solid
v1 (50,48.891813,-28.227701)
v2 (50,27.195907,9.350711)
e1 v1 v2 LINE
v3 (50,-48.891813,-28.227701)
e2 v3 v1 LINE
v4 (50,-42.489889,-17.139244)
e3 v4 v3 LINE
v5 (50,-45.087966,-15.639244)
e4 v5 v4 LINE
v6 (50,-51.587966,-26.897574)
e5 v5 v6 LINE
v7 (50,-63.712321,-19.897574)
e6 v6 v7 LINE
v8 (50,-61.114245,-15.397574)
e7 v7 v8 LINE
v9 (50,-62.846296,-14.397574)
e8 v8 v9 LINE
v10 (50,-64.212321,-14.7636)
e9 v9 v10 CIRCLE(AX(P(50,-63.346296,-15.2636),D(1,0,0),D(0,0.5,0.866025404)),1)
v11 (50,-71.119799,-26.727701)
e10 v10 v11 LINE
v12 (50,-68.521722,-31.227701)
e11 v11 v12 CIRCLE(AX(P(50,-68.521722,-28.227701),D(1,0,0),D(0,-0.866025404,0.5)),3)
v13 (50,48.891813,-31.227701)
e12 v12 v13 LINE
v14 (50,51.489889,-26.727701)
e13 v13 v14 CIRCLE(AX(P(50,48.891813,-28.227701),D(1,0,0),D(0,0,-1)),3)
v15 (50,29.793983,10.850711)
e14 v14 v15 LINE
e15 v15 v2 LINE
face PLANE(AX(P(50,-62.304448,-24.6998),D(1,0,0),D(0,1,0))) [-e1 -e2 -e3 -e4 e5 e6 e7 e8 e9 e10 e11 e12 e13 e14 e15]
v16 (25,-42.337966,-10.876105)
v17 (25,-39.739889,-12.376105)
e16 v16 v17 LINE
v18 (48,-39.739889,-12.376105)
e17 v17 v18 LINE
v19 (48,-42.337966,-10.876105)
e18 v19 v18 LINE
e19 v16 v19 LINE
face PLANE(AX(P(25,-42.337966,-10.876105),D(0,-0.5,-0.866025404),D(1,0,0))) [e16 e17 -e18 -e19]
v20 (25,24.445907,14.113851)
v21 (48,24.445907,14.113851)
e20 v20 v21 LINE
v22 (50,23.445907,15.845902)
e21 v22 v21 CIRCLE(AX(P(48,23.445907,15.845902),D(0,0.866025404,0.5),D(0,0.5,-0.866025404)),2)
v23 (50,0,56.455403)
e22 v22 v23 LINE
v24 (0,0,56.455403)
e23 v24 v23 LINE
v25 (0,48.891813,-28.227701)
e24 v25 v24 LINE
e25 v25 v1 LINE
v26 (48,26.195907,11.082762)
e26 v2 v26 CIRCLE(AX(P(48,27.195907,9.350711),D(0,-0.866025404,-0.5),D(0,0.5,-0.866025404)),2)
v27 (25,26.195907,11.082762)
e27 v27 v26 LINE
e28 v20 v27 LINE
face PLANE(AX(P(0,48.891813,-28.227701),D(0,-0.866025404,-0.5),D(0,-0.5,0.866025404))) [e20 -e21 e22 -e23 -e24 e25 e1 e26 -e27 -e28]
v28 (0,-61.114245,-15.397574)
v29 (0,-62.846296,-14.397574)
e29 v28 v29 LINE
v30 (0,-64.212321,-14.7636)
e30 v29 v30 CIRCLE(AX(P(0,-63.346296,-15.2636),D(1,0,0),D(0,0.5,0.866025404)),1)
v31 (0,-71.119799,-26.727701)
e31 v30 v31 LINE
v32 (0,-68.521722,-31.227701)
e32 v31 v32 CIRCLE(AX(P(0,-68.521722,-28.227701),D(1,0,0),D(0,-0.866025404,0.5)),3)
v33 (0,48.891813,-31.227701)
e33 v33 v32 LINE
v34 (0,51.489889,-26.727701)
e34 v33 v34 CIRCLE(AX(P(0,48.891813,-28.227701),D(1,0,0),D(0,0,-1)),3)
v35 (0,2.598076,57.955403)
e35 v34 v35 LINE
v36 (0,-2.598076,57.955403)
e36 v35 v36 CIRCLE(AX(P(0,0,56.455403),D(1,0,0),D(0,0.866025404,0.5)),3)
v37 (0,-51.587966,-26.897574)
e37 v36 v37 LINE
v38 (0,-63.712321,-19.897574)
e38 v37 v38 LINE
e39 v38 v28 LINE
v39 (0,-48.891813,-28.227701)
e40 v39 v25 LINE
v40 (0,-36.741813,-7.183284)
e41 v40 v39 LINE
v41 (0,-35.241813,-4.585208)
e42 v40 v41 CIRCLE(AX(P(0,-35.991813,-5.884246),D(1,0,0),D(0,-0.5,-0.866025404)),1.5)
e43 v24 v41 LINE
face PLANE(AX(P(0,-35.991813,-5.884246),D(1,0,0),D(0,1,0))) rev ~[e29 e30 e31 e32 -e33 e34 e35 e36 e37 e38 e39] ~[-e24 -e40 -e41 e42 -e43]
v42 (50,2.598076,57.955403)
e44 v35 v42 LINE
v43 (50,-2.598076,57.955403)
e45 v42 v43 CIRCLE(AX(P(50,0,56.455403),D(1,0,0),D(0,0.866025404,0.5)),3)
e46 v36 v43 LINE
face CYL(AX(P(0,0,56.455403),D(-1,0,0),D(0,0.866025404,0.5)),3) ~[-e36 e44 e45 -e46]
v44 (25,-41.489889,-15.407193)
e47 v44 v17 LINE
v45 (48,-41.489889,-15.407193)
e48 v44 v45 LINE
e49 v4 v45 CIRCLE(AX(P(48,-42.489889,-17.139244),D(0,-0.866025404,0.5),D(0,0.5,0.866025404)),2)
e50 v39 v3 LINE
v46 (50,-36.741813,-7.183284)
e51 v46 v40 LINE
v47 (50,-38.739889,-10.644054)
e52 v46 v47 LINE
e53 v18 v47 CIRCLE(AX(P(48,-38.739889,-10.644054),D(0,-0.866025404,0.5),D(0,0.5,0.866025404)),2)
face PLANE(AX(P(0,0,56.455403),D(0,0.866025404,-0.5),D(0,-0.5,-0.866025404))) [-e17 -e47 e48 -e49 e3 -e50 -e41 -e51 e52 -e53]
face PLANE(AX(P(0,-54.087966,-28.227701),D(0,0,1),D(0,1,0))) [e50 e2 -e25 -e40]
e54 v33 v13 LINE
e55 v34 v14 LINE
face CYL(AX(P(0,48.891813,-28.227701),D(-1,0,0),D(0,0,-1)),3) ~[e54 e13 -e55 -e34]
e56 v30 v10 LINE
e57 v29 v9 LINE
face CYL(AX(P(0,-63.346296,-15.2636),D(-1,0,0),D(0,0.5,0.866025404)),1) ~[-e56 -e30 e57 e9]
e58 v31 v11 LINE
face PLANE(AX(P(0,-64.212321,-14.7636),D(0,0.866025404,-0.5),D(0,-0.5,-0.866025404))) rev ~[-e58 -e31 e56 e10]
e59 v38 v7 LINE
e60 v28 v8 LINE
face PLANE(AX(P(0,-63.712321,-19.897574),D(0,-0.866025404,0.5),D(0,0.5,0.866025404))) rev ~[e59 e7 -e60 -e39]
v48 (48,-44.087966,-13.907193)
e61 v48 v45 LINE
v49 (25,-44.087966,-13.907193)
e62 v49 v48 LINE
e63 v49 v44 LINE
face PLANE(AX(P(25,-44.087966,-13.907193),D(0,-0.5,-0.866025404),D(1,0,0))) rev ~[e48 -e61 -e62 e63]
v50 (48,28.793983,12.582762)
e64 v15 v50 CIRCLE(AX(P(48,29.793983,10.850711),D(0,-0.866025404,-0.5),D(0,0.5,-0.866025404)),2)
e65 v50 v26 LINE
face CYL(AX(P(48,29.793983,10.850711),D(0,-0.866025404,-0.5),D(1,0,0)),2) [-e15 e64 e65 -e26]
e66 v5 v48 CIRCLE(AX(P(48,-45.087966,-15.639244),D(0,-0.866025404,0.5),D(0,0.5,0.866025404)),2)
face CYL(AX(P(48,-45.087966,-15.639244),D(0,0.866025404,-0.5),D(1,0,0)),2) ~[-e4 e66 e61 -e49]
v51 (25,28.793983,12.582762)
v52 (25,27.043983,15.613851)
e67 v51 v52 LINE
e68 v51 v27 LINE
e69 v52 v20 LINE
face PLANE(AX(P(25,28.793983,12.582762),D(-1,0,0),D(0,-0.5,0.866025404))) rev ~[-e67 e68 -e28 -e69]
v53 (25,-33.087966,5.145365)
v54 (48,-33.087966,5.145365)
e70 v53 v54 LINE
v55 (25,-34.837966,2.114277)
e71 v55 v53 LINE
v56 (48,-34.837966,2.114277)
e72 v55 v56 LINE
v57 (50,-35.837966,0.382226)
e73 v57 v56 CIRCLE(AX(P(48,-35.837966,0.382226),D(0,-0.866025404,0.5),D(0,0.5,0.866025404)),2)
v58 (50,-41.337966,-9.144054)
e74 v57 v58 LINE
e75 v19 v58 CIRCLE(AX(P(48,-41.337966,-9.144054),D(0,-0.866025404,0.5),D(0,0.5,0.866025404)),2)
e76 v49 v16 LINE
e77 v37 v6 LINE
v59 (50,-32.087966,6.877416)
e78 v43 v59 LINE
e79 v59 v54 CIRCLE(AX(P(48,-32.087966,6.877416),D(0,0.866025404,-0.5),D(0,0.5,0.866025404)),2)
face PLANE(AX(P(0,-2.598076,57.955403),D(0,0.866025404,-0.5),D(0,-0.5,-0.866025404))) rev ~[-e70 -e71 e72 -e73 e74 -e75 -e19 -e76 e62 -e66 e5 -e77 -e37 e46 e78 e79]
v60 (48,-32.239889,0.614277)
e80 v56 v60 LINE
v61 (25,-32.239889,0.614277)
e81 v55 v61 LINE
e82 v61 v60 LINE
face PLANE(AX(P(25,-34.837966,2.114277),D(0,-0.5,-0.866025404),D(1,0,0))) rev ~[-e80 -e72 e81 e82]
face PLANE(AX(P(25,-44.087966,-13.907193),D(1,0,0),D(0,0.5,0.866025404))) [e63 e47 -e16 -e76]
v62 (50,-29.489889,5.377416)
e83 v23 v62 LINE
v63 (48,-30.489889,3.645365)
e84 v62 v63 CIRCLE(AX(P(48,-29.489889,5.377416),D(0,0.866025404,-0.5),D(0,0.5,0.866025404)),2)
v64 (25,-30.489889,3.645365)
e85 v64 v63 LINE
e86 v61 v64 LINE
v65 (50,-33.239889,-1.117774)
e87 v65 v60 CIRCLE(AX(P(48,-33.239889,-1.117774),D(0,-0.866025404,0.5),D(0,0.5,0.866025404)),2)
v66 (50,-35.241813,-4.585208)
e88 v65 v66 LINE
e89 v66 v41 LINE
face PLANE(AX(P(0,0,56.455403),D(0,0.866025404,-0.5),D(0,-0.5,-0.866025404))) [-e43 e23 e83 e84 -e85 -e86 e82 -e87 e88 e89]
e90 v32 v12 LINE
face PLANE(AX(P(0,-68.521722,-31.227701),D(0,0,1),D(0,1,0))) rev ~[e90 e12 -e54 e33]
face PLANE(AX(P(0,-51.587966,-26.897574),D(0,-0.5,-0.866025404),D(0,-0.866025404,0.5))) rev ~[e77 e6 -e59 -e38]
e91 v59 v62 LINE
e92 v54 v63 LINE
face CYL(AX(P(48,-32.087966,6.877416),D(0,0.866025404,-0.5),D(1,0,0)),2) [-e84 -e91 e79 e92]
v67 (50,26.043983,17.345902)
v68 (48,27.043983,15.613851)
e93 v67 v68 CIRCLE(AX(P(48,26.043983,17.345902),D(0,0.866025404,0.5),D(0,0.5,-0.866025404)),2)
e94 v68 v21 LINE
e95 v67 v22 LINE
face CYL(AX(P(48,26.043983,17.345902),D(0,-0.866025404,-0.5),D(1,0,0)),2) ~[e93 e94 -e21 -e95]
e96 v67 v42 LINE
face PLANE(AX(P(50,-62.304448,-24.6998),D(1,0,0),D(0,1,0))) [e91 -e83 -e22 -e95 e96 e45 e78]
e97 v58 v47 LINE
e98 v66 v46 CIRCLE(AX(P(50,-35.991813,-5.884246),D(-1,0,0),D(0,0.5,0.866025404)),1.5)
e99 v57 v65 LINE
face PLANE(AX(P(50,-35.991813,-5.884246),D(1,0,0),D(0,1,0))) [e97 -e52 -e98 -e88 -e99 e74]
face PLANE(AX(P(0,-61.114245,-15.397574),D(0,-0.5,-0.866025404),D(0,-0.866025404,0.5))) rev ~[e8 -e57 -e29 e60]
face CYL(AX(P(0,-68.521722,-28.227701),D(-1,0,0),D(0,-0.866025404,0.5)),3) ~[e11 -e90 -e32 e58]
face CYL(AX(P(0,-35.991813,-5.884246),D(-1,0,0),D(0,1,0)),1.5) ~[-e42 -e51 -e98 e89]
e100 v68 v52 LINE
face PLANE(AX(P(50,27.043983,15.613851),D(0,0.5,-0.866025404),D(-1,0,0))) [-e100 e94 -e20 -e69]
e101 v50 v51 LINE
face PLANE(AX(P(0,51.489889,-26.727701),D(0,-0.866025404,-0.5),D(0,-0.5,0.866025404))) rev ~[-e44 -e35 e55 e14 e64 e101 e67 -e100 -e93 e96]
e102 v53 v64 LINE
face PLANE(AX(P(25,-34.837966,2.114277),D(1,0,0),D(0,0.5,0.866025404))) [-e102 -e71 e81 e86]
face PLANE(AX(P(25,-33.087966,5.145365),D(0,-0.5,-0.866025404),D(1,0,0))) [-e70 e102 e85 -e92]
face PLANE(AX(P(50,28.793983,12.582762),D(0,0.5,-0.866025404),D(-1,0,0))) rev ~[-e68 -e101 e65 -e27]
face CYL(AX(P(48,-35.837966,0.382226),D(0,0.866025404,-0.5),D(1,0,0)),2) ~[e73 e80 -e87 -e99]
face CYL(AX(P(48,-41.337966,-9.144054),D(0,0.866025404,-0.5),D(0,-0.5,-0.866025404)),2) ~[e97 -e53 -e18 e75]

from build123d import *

# Parameters (mm, degrees)
F1_DEPTH  = 50
F2_T      = 3
F4_DEPTH  = 50
F5_W      = 25
F5_H      = 3.5
F6_DEPTH  = 3
F7_W      = 25
F7_H      = 3.5
F8_DEPTH  = 3
F9_R      = 2
F10_R     = 1.5
F11_DEPTH = 50
F12_W     = 25
F12_H     = 3.5
F13_DEPTH = 10
F14_R     = 2


# Not quite as in the source:
# - a shell that OpenCascade refuses in one call is made with other operations: the cavity is built on its own and cut out


with BuildPart() as f1:
    # F0 (on Right) → F1 (new body)
    with BuildSketch(Plane.YZ):
        with BuildLine():
            Line((-2.5980762114, 57.9554029985), (-54.0879656003, -31.2277014993))
            Line((-54.0879656003, -31.2277014993), (48.8918131776, -31.2277014993))
            ThreePointArc((48.8918131776, -31.2277014993), (51.4898893889, -29.7277014993), (51.4898893889, -26.7277014993))
            Line((51.4898893889, -26.7277014993), (2.5980762114, 57.9554029985))
            ThreePointArc((2.5980762114, 57.9554029985), (0, 59.4554029985), (-2.5980762114, 57.9554029985))
        make_face()
    extrude(amount=F1_DEPTH)

    # F2: shell of thickness 3, made by hand


with BuildPart() as f2_core1:
    # F2_t2: copy of F1
    add(f1.part)

    # the walls: a layer under each face that stays
    f2_faces = [f2_core1.faces().sort_by_distance(p)[0] for p in [
        (25, -28.3430209058, 13.3638507496),
        (25, -2.5980762114, -31.2277014993),
        (25, 27.0439828001, 15.6138507496),
    ]]
    thicken(f2_faces, amount=-F2_T, mode=Mode.SUBTRACT)


with BuildPart() as f1_1:
    add(f1.part)

    # what is left inside the walls is the cavity
    f2_cavity = [f2_core1.part.solids().sort_by_distance(p)[0] for p in [
        (33.333333, -24.419926, 14.098851),
    ]]
    add(f2_cavity, mode=Mode.SUBTRACT)

    # F3 (on Right) → F4 (join)
    with BuildSketch(Plane.YZ):
        with BuildLine():
            Line((-54.0879656003, -31.2277014993), (-51.5879656003, -26.8975744803))
            Line((-51.5879656003, -26.8975744803), (-63.7123212533, -19.8975744803))
            Line((-63.7123212533, -19.8975744803), (-61.1142450419, -15.3975744803))
            Line((-61.1142450419, -15.3975744803), (-62.8462958495, -14.3975744803))
            ThreePointArc((-62.8462958495, -14.3975744803), (-63.6051148946, -14.2976740578), (-64.2123212533, -14.7635998841))
            Line((-64.2123212533, -14.7635998841), (-71.1197985414, -26.7277014993))
            ThreePointArc((-71.1197985414, -26.7277014993), (-71.1197985414, -29.7277014993), (-68.52172233, -31.2277014993))
            Line((-68.52172233, -31.2277014993), (-54.0879656003, -31.2277014993))
        make_face()
    extrude(amount=F4_DEPTH)

    # F5 (on face) → F6 (cut, through all)
    with BuildSketch(Plane(origin=(0, -27.0439828002, 15.6138507496), x_dir=(1, 0, 0), z_dir=(0, -0.8660254038, 0.5))):
        with Locations((37.5, -32.3379656003)):
            Rectangle(F5_W, F5_H)
    extrude(amount=-F6_DEPTH, mode=Mode.SUBTRACT)

    # F7 (on face) → F8 (cut, through all)
    with BuildSketch(Plane(origin=(0, -27.0439828002, 15.6138507496), x_dir=(1, 0, 0), z_dir=(0, -0.8660254038, 0.5))):
        with Locations((37.5, -13.8379656003)):
            Rectangle(F7_W, F7_H)
    extrude(amount=-F8_DEPTH, mode=Mode.SUBTRACT)

    # F9
    f9_edges = [f1_1.edges().sort_by_distance(p)[0] for p in [
        (50, -31.788927, 4.395365),
        (50, -33.538927, 1.364277),
        (50, -41.038927, -11.626105),
        (50, -42.788927, -14.657193),
    ]]
    fillet(f9_edges, radius=F9_R)

    # F10 (on Right) → F11 (join)
    with BuildSketch(Plane.YZ):
        with Locations((-35.9918131776, -5.8842460816)):
            Circle(F10_R)
    extrude(amount=F11_DEPTH)

    # F12 (on face) → F13 (cut)
    with BuildSketch(Plane(origin=(0, 27.0439828001, 15.6138507496), x_dir=(-1, 0, 0), z_dir=(0, 0.8660254038, 0.5))):
        with Locations((-37.5, -1.75)):
            Rectangle(F12_W, F12_H)
    extrude(amount=-F13_DEPTH, mode=Mode.SUBTRACT)

    # F14
    f14_edges = [f1_1.edges().sort_by_distance(p)[0] for p in [
        (50, 27.494945, 11.832762),
        (50, 25.744945, 14.863851),
    ]]
    fillet(f14_edges, radius=F14_R)


solid = f1_1.part
